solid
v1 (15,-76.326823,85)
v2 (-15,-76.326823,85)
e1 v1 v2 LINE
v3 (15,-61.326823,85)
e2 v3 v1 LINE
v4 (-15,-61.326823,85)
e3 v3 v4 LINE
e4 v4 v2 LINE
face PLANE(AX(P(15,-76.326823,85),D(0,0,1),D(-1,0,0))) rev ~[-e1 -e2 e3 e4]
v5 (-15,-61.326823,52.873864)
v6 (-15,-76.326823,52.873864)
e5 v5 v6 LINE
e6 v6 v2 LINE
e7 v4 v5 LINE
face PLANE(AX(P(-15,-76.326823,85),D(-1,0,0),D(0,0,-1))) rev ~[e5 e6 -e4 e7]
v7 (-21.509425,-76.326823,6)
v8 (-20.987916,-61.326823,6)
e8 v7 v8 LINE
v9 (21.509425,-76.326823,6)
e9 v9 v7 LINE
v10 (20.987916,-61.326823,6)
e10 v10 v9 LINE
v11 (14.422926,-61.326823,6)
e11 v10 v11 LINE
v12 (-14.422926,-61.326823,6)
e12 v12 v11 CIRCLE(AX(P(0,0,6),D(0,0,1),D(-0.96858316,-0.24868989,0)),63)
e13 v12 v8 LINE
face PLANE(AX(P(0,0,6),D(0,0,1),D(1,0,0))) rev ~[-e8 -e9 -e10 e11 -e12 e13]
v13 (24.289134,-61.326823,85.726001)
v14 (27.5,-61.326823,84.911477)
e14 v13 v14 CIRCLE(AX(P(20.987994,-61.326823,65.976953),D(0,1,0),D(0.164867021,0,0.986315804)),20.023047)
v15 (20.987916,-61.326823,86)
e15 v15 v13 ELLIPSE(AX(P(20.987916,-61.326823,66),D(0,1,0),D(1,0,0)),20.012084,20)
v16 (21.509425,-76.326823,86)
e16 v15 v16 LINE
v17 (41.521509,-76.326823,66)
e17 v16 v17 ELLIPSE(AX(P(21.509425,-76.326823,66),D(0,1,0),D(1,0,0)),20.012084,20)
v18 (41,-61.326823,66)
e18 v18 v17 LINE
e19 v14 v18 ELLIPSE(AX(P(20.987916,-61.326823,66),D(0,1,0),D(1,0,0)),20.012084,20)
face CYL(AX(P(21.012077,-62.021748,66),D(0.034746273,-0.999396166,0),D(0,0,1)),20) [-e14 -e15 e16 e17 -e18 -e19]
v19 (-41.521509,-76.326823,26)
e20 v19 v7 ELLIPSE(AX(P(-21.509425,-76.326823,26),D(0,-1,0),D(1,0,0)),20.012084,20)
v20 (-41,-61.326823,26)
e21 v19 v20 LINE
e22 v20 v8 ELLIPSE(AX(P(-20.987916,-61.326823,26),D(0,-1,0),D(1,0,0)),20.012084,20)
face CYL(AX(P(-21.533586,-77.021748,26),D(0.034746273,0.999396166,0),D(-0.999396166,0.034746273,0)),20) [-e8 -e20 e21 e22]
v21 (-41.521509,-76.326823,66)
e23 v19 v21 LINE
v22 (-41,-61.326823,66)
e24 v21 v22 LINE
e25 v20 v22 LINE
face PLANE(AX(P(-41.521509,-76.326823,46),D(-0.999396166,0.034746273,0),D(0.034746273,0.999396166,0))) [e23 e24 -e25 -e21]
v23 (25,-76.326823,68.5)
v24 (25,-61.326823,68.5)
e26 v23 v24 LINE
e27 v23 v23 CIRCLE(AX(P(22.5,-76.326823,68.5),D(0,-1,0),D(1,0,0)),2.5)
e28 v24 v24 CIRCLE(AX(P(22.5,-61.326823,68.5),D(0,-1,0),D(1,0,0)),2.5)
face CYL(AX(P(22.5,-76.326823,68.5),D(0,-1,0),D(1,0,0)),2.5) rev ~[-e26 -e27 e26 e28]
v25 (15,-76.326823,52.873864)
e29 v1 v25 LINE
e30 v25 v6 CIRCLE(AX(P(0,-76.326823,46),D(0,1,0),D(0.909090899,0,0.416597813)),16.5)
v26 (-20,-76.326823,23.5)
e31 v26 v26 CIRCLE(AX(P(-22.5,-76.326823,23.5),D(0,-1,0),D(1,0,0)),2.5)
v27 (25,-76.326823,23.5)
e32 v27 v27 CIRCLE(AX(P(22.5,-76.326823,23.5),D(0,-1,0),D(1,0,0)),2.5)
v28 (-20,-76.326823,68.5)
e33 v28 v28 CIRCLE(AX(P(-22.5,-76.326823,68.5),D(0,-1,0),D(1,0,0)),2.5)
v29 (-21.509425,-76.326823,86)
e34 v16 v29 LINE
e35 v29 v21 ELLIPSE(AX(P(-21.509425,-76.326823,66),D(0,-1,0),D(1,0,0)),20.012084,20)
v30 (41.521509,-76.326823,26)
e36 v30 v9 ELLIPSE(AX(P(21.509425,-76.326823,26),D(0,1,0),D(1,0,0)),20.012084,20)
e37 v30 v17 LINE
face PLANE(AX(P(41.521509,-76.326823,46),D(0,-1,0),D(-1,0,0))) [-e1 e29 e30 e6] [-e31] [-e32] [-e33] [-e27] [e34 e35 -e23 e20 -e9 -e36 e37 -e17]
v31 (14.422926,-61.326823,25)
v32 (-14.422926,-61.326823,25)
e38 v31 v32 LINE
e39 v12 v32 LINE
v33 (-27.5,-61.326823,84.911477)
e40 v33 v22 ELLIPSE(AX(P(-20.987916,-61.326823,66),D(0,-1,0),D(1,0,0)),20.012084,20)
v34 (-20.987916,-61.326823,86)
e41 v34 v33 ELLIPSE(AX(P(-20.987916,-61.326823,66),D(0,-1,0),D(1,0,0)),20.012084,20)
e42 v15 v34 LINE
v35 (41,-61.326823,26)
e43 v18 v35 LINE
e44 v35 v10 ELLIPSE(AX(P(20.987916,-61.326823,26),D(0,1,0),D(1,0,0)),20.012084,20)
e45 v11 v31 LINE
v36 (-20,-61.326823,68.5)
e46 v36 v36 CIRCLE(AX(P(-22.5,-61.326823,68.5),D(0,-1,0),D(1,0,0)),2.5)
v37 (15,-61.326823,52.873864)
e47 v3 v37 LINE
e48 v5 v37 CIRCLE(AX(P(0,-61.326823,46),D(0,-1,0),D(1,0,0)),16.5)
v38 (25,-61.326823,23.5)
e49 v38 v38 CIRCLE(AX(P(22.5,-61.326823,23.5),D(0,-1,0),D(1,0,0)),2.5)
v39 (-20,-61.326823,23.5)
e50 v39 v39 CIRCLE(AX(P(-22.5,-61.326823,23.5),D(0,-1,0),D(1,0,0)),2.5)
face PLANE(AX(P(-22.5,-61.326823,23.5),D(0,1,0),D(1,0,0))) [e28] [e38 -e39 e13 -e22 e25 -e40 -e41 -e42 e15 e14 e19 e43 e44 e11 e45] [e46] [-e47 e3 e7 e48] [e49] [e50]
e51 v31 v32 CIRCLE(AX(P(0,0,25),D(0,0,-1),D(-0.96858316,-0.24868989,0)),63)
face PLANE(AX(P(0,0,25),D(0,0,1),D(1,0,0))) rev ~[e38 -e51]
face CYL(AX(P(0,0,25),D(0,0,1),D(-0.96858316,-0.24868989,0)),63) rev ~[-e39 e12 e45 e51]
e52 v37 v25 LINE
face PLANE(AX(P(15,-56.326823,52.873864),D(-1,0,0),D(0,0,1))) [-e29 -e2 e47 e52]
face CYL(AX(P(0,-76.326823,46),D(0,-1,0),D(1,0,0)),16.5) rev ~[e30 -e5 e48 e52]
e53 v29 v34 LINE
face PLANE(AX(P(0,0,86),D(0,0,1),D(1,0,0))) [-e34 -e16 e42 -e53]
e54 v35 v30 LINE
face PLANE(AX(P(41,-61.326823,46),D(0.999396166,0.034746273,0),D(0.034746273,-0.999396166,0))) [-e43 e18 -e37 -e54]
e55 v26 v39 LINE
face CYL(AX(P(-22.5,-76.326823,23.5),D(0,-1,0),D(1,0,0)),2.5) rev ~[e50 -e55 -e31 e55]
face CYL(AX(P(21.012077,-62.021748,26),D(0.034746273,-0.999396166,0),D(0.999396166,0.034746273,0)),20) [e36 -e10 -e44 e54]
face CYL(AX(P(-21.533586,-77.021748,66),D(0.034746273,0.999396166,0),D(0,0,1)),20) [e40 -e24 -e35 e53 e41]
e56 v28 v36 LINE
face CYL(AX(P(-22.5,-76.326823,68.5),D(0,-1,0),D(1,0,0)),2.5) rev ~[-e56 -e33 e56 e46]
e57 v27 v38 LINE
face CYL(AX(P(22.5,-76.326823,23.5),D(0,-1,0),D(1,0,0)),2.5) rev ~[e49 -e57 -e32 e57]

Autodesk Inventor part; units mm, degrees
ref_plane "YZ Plane" through (0, 0, 0) normal (1, 0, 0) x (0, 1, 0)
sketch "Sketch3" plane through (0, 0, 0) normal (0, 0, 1) x (1, 0, 0)
  circle A0 centre (0, 0) radius 60
  dimension "d49" = 120
sketch "Sketch3 outline for Extrusion2" plane through (0, 0, 0) normal (0, 0, 1) x (1, 0, 0)
  circle A0 centre (0, 0) radius 60
extrude "Extrusion2" add sketch "Sketch3 outline for Extrusion2" along normal blind 67
sketch "Sketch4" plane through (0, 0, 0) normal (0, 0, -1) x (-1, 0, 0)
  circle A0 centre (0, 0) radius 4.25
  dimension "d52" = 8.5
sketch "Sketch4 outline for Extrusion3" plane through (0, 0, 0) normal (0, 0, -1) x (-1, 0, 0)
  circle A0 centre (0, 0) radius 4.25
extrude "Extrusion3" cut sketch "Sketch4 outline for Extrusion3" against normal through all
ref_plane "Work Plane11" through (0, 0, 46) normal (0, 0, 1) x (1, 0, 0)
sketch "Sketch6" plane through (0, 0, 46) normal (0, 0, 1) x (1, 0, 0)
  line L0 (-27.5, -53.326823) -> (27.5, -53.326823)
  line L1 (27.5, -53.326823) -> (27.5, -61.326823)
  line L2 (27.5, -61.326823) -> (-27.5, -61.326823)
  line L3 (-27.5, -61.326823) -> (-27.5, -53.326823)
  circle A0 centre (0, 0) radius 4.25 construction
  circle A1 centre (0, 0) radius 60 construction
  dimension "d63" = 55
  dimension "d64" = 8
sketch "Sketch6 outline for Extrusion5" plane through (0, 0, 46) normal (0, 0, 1) x (1, 0, 0)
  line L0 (-27.5, -53.326823) -> (27.5, -53.326823)
  line L1 (27.5, -53.326823) -> (27.5, -61.326823)
  line L2 (27.5, -61.326823) -> (-27.5, -61.326823)
  line L3 (-27.5, -61.326823) -> (-27.5, -53.326823)
extrude "Extrusion5" add sketch "Sketch6 outline for Extrusion5" along normal mid plane 42
sketch "Sketch7" plane through (0, 0, 46) normal (0, 0, 1) x (1, 0, 0)
  line L0 (-41, -61.326823) -> (41, -61.326823)
  line L1 (41.521509, -76.326823) -> (-41.521509, -76.326823)
  line L2 (27.5, -61.326823) -> (-27.5, -61.326823)
  line L3 (-41.521509, -76.326823) -> (-41, -61.326823)
  line L4 (41.521509, -76.326823) -> (41, -61.326823)
  point P0 (0, 0)
  point P1 (0, -61.326823)
  point P2 (0, -76.326823)
  dimension "d67" = 83.04302
  dimension "d99" = 82
  dimension "d100" = 15
sketch "Sketch7 outline for Extrusion6" plane through (0, 0, 46) normal (0, 0, 1) x (1, 0, 0)
  line L0 (-41, -61.326823) -> (0, -61.326823)
  line L1 (0, -61.326823) -> (41, -61.326823)
  line L2 (41, -61.326823) -> (41.521509, -76.326823)
  line L3 (41.521509, -76.326823) -> (-41.521509, -76.326823)
  line L4 (-41.521509, -76.326823) -> (-41, -61.326823)
extrude "Extrusion6" add sketch "Sketch7 outline for Extrusion6" along normal mid plane 80
sketch "Sketch8" plane through (-41.521509, -76.326823, 86) normal (0, -1, 0) x (1, 0, 0)
  line L0 (64.021509, -62.5) -> (19.021509, -62.5) construction
  line L1 (19.021509, -62.5) -> (19.021509, -17.5) construction
  line L2 (19.021509, -17.5) -> (64.021509, -17.5) construction
  line L3 (64.021509, -17.5) -> (64.021509, -62.5) construction
  circle A0 centre (64.021509, -62.5) radius 2.5
  circle A1 centre (64.021509, -17.5) radius 2.5
  circle A2 centre (19.021509, -62.5) radius 2.5
  circle A3 centre (19.021509, -17.5) radius 2.5
  line L4 (0, 0) -> (83.043018, 0)
  line L5 (83.043018, 0) -> (83.043018, -80)
  point P0 (23.25, -86)
  point P1 (41.521509, -17.5)
  point P2 (41.521509, 0)
  point P3 (64.021509, -40)
  point P4 (83.043018, -40)
  dimension "d75" = 45
  dimension "d78" = 5
  dimension "d79" = 5
  dimension "d101" = 45
  dimension "d102" = 5
  dimension "d103" = 5
sketch "Sketch8 outline for Extrusion7" plane through (-41.521509, -76.326823, 86) normal (0, -1, 0) x (1, 0, 0)
  circle A0 centre (64.021509, -62.5) radius 2.5
  circle A1 centre (64.021509, -17.5) radius 2.5
  circle A2 centre (19.021509, -62.5) radius 2.5
  circle A3 centre (19.021509, -17.5) radius 2.5
extrude "Extrusion7" cut sketch "Sketch8 outline for Extrusion7" against normal blind 25
sketch "Sketch9" plane through (-41.521509, -76.326823, 86) normal (0, -1, 0) x (1, 0, 0)
  circle A0 centre (41.521509, -40) radius 16.5
  circle A1 centre (19.021509, -62.5) radius 2.5 construction
  circle A2 centre (64.021509, -62.5) radius 2.5 construction
  circle A3 centre (64.021509, -17.5) radius 2.5 construction
  circle A4 centre (19.021509, -17.5) radius 2.5 construction
  line L0 (83.043018, 0) -> (83.043018, -80) construction
  line L1 (0, 0) -> (83.043018, 0) construction
  line L2 (0, 0) -> (0, -80) construction
  line L3 (83.043018, -80) -> (0, -80) construction
  point P0 (23.25, -86)
  point P1 (0, -40)
  point P2 (41.521509, 0)
  dimension "d82" = 33
sketch "Sketch9 outline for Extrusion8" plane through (-41.521509, -76.326823, 86) normal (0, -1, 0) x (1, 0, 0)
  circle A0 centre (41.521509, -40) radius 16.5
extrude "Extrusion8" cut sketch "Sketch9 outline for Extrusion8" against normal blind 45
sketch "Sketch14" plane through (0, 0, 46) normal (0, 0, 1) x (1, 0, 0)
  line L0 (16.5, -76.326823) -> (16.5, -31.326823)
  line L1 (16.5, -31.326823) -> (-16.5, -31.326823)
  line L2 (-16.5, -31.326823) -> (-16.5, -16.326823)
  line L3 (-16.5, -16.326823) -> (16.5, -16.326823)
  line L4 (16.5, -16.326823) -> (16.5, -31.326823)
  point P0 (0, 0)
  dimension "d91" = 33
  dimension "d92" = 15
sketch "Sketch14 outline for Extrusion10" plane through (0, 0, 46) normal (0, 0, 1) x (1, 0, 0)
  line L0 (16.5, -31.326823) -> (-16.5, -31.326823)
  line L1 (-16.5, -31.326823) -> (-16.5, -16.326823)
  line L2 (-16.5, -16.326823) -> (16.5, -16.326823)
  line L3 (16.5, -16.326823) -> (16.5, -31.326823)
extrude "Extrusion10" cut sketch "Sketch14 outline for Extrusion10" along normal mid plane 33
sketch "Sketch15" plane through (16.5, -31.326823, 29.5) normal (-1, 0, 0) x (0, 0, 1)
  line L0 (33, 15) -> (0, 15) projected
  line L1 (0, 15) -> (0, 0) projected
  line L2 (0, 0) -> (16.5, 0) projected
  line L3 (16.5, 0) -> (33, 0) projected
  line L4 (33, 0) -> (33, 15) projected
  line L5 (24, 14) -> (9, 14)
  line L6 (9, 14) -> (9, 1)
  line L7 (9, 1) -> (24, 1)
  line L8 (24, 1) -> (24, 14)
  point P0 (-29.5, 31.326823)
  point P1 (16.5, 1)
  point P2 (24, 7.5)
  point P3 (33, 7.5)
  dimension "d95" = 15
  dimension "d96" = 13
sketch "Sketch15 outline for Extrusion11" plane through (16.5, -31.326823, 29.5) normal (-1, 0, 0) x (0, 0, 1)
  line L0 (24, 1) -> (24, 14)
  line L1 (9, 1) -> (24, 1)
  line L2 (9, 14) -> (9, 1)
  line L3 (24, 14) -> (9, 14)
extrude "Extrusion11" cut sketch "Sketch15 outline for Extrusion11" along normal through all
fillet "Fillet4" radius 20 4 edges at (41.2608, -68.8268, 86) (41.2608, -68.8268, 6) (-41.2608, -68.8268, 86) (-41.2608, -68.8268, 6)
ref_plane "Work Plane15" through (0, 0, 25) normal (0, 0, -1) x (-0.9685832, -0.2486899, 0)
sketch "Sketch16" plane through (0, 0, 25) normal (0, 0, -1) x (-0.9685832, -0.2486899, 0)
  circle A0 centre (0, 0) radius 60
  circle A1 centre (0, 0) radius 63
  dimension "d107" = 3
sketch "Sketch16 outline for Extrusion12" plane through (0, 0, 25) normal (0, 0, -1) x (-0.9685832, -0.2486899, 0)
  circle A0 centre (0, 0) radius 63
extrude "Extrusion12" cut sketch "Sketch16 outline for Extrusion12" along normal through all
sketch "Sketch17" plane through (0, 0, 25) normal (0, 0, -1) x (-1, 0, 0)
  circle A0 centre (33.900411, 8.704146) radius 2.5
  circle A1 centre (9.412194, 33.71069) radius 2.5
  circle A2 centre (-24.488217, 25.006544) radius 2.5
  circle A3 centre (-33.900411, -8.704146) radius 2.5
  circle A4 centre (-9.412194, -33.71069) radius 2.5
  circle A5 centre (24.488217, -25.006544) radius 2.5
  line L0 (33.900411, 8.704146) -> (-33.900411, -8.704146) construction
  line L1 (-1.798057, -79.48798) -> (39.869276, -68.789627)
  point P0 (0, 0)
  dimension "d108" = 5
  dimension "d109" = 35
  dimension "d112" = 360
sketch "Sketch17 outline for Extrusion13" plane through (0, 0, 25) normal (0, 0, -1) x (-1, 0, 0)
  circle A0 centre (33.900411, 8.704146) radius 2.5
  circle A1 centre (9.412194, 33.71069) radius 2.5
  circle A2 centre (-24.488217, 25.006544) radius 2.5
  circle A3 centre (-33.900411, -8.704146) radius 2.5
extrude "Extrusion13" cut sketch "Sketch17 outline for Extrusion13" against normal blind 25
sketch "Sketch20" plane through (0, 0, 67) normal (0, 0, 1) x (1, 0, 0)
  arc A0 (27.5, -53.326823) -> (-27.5, -53.326823) centre (0, 0) ccw
  circle A1 centre (0, 0) radius 60
  circle A2 centre (0, 0) radius 4.25
sketch "Sketch20 outline for Extrusion15" plane through (0, 0, 67) normal (0, 0, 1) x (1, 0, 0)
  circle A0 centre (0, 0) radius 60
  circle A1 centre (0, 0) radius 4.25
extrude "Extrusion15" add sketch "Sketch20 outline for Extrusion15" along normal blind 25
sketch "Sketch21" plane through (-21.509425, -76.326823, 6) normal (0, -1, 0) x (1, 0, 0)
  line L0 (36.509425, 79) -> (6.509425, 79)
  line L1 (6.509425, 79) -> (6.509425, 55)
  line L2 (6.509425, 55) -> (36.509425, 55)
  line L3 (36.509425, 55) -> (36.509425, 79)
  circle A0 centre (21.509425, 40) radius 16.5
  line L4 (36.509425, 67) -> (6.509425, 67)
  point P0 (21.509425, -6)
  point P1 (21.509425, 67)
  dimension "d124" = 30
  dimension "d125" = 24
  dimension "d126" = 27
sketch "Sketch21 outline for Extrusion16" plane through (-21.509425, -76.326823, 6) normal (0, -1, 0) x (1, 0, 0)
  line L0 (6.509425, 55) -> (36.509425, 55)
  line L1 (36.509425, 55) -> (36.509425, 79)
  line L2 (36.509425, 79) -> (6.509425, 79)
  line L3 (6.509425, 79) -> (6.509425, 55)
extrude "Extrusion16" cut sketch "Sketch21 outline for Extrusion16" against normal blind 15
sketch "Sketch22" plane through (-27.5, -61.326823, 67) normal (0, 1, 0) x (1, 0, 0)
  line L0 (55, 0) -> (55, 42)
  line L1 (0, 0) -> (0, 42)
  line L2 (0, 0) -> (3, 0)
  line L3 (55, 0) -> (55, -17.911477)
  line L4 (0, 0) -> (0, -17.911477)
  line L5 (5.990575, -19) -> (6.512084, -19) construction
  line L6 (-13.5, 1) -> (-14.021509, 1) construction
  circle A0 centre (5, -1.5) radius 2.5
  line L7 (42.5, -18) -> (42.5, 6)
  line L8 (12.5, -18) -> (42.5, -18)
  line L9 (12.5, 6) -> (12.5, -18)
  line L10 (7, 0) -> (12.5, 0)
  line L11 (12.5, 0) -> (12.5, -18)
  line L12 (12.5, -18) -> (42.5, -18)
  line L13 (55, 0) -> (52, 0)
  circle A1 centre (50, -1.5) radius 2.5
  line L14 (48, 0) -> (42.5, 0)
  line L15 (42.5, 0) -> (42.5, -18)
  arc A2 (48, 0) -> (52, 0) centre (50, -1.5) ccw
  arc A3 (3, 0) -> (7, 0) centre (5, -1.5) ccw
  line L16 (5.990575, -19) -> (6.285813, -19)
  line L17 (-13.5, 1) -> (-14.021509, 1)
  line L18 (5.990575, -19) -> (6.512084, -19)
  line L19 (48.487916, -19) -> (49.009425, -19)
  arc A4 (0, -17.911477) -> (6.285813, -19) centre (6.512084, 1) ccw
  arc A5 (48.487916, -19) -> (55, -17.911477) centre (48.487997, 1.023032) ccw
  line L20 (48.487916, -19) -> (6.285813, -19)
  line L21 (5.990575, -19) -> (49.009425, -19)
  ellipse E0 centre (5.990575, 1) end of major axis (-14.021509, 1) minor radius 20 (-14.021509, 1) -> (5.990575, -19) ccw
  line L22 (5.990575, -19) -> (6.512084, -19)
  ellipse E1 centre (6.512084, 1) end of major axis (-13.5, 1) minor radius 20 (-13.5, 1) -> (6.512084, -19) ccw
  line L23 (-13.5, 1) -> (-14.021509, 1)
  ellipse E2 centre (48.487916, 1) end of major axis (68.5, 1) minor radius 20 (48.487916, -19) -> (68.5, 1) ccw
  line L24 (48.487916, -19) -> (49.009425, -19)
  ellipse E3 centre (49.009425, 1) end of major axis (69.021509, 1) minor radius 20 (49.009425, -19) -> (69.021509, 1) ccw
  line L25 (69.021509, 1) -> (68.5, 1)
  point P0 (27.5, 67)
  point P1 (51.789134, -18.726001)
sketch "Sketch22 outline for Extrusion17" plane through (-27.5, -61.326823, 67) normal (0, 1, 0) x (1, 0, 0)
  line L0 (55, -17.911477) -> (55, 0)
  arc A0 (51.789134, -18.726001) -> (55, -17.911477) centre (48.487997, 1.023032) ccw
  arc A1 (48.487916, -19) -> (51.789134, -18.726001) centre (48.487997, 1.023032) ccw
  line L1 (6.285813, -19) -> (48.487916, -19)
  arc A2 (0, -17.911477) -> (6.285813, -19) centre (6.512084, 1) ccw
  line L2 (0, 0) -> (0, -17.911477)
  line L3 (3, 0) -> (0, 0)
  arc A3 (7, 0) -> (3, 0) centre (5, -1.5) cw
  line L4 (12.5, 0) -> (7, 0)
  line L5 (12.5, -18) -> (12.5, 0)
  line L6 (42.5, -18) -> (12.5, -18)
  line L7 (42.5, 0) -> (42.5, -18)
  line L8 (48, 0) -> (42.5, 0)
  arc A4 (52, 0) -> (48, 0) centre (50, -1.5) cw
  line L9 (55, 0) -> (52, 0)
extrude "Extrusion17" add sketch "Sketch22 outline for Extrusion17" along normal blind 15
sketch "Sketch23" plane through (-21.509425, -76.326823, 6) normal (0, -1, 0) x (1, 0, 0)
  line L0 (36.509425, 79) -> (36.509425, 55)
  line L1 (36.509425, 55) -> (6.509425, 55)
  line L2 (6.509425, 55) -> (6.509425, 79)
  line L3 (6.509425, 79) -> (36.509425, 79)
  point P0 (21.509425, -6)
sketch "Sketch23 outline for Extrusion18" plane through (-21.509425, -76.326823, 6) normal (0, -1, 0) x (1, 0, 0)
  line L0 (36.509425, 79) -> (36.509425, 55)
  line L1 (36.509425, 55) -> (6.509425, 55)
  line L2 (6.509425, 55) -> (6.509425, 79)
  line L3 (6.509425, 79) -> (36.509425, 79)
extrude "Extrusion18" cut sketch "Sketch23 outline for Extrusion18" against normal blind 20
sketch "Sketch25" plane through (-21.509425, -56.326823, 6) normal (0, -1, 0) x (1, 0, 0)
  line L0 (36.509425, 55) -> (28.383288, 55)
  arc A0 (21.509425, 56.5) -> (5.009425, 40) centre (21.509425, 40) ccw
  line L1 (36.509425, 55) -> (6.509425, 55)
  line L2 (6.509425, 55) -> (6.509425, 46.873864)
  line L3 (6.509425, 46.873864) -> (36.509425, 46.873864)
  line L4 (36.509425, 46.873864) -> (36.509425, 55)
  point P0 (21.509425, -6)
sketch "Sketch25 outline for Extrusion20" plane through (-21.509425, -56.326823, 6) normal (0, -1, 0) x (1, 0, 0)
  line L0 (36.509425, 46.873864) -> (36.509425, 55)
  line L1 (6.509425, 46.873864) -> (36.509425, 46.873864)
  line L2 (6.509425, 55) -> (6.509425, 46.873864)
  line L3 (36.509425, 55) -> (6.509425, 55)
extrude "Extrusion20" cut sketch "Sketch25 outline for Extrusion20" along normal blind 25
sketch "Sketch26" plane through (0, 0, 92) normal (0, 0, 1) x (1, 0, 0)
  circle A0 centre (0, 0) radius 4.25 projected
  circle A1 centre (0, 0) radius 13.5
  dimension "d138" = 27
sketch "Sketch26 outline for Extrusion21" plane through (0, 0, 92) normal (0, 0, 1) x (1, 0, 0)
  circle A0 centre (0, 0) radius 13.5
  circle A1 centre (0, 0) radius 4.25
extrude "Extrusion21" cut sketch "Sketch26 outline for Extrusion21" against normal blind 10
sketch "Sketch27" plane through (0, 0, 82) normal (0, 0, 1) x (1, 0, 0)
  circle A0 centre (9.525, 0) radius 1.5
  circle A1 centre (4.7625, 8.248892) radius 1.5
  circle A2 centre (-4.7625, 8.248892) radius 1.5
  circle A3 centre (-9.525, 0) radius 1.5
  circle A4 centre (-4.7625, -8.248892) radius 1.5
  circle A5 centre (4.7625, -8.248892) radius 1.5
  point P0 (0, 0)
  dimension "d141" = 3
  dimension "d142" = 9.525
  dimension "d145" = 360
sketch "Sketch27 outline for Extrusion22" plane through (0, 0, 82) normal (0, 0, 1) x (1, 0, 0)
  circle A0 centre (9.525, 0) radius 1.5
  circle A1 centre (4.7625, 8.248892) radius 1.5
  circle A2 centre (-4.7625, 8.248892) radius 1.5
  circle A3 centre (-9.525, 0) radius 1.5
  circle A4 centre (-4.7625, -8.248892) radius 1.5
  circle A5 centre (4.7625, -8.248892) radius 1.5
extrude "Extrusion22" cut sketch "Sketch27 outline for Extrusion22" against normal blind 15
sketch "Sketch28" plane through (0, 0, 0) normal (0, 1, 0) x (-1, 0, 0)
  circle A0 centre (0, 79.65) radius 1.5
  circle A1 centre (0, 84.75) radius 1.5
  line L0 (4.25, 82) -> (-4.25, 82) projected
  line L1 (0, 82) -> (0, 83.25)
  line L2 (0, 83.25) -> (0, 81.15)
  point P0 (0, 0)
  point P1 (0, 86.25)
  dimension "d151" = 3
  dimension "d150" = 3
  dimension "d153" = 1.25
  dimension "d166" = 2.1
sketch "Sketch28 outline for Extrusion23" plane through (0, 0, 0) normal (0, 1, 0) x (-1, 0, 0)
  circle A0 centre (0, 79.65) radius 1.5
  circle A1 centre (0, 84.75) radius 1.5
extrude "Extrusion23" cut sketch "Sketch28 outline for Extrusion23" along normal through all
sketch "Sketch29" plane through (0, 0, 92) normal (0, 0, 1) x (1, 0, 0)
  circle A0 centre (0, 0) radius 17.5
  circle A1 centre (0, 0) radius 50
  dimension "d156" = 35
  dimension "d157" = 100
sketch "Sketch29 outline for Extrusion24" plane through (0, 0, 92) normal (0, 0, 1) x (1, 0, 0)
  circle A0 centre (0, 0) radius 50
  circle A1 centre (0, 0) radius 17.5
extrude "Extrusion24" cut sketch "Sketch29 outline for Extrusion24" against normal blind 20
sketch "Sketch30" plane through (0, 0, 82) normal (0, 0, 1) x (1, 0, 0)
  circle A0 centre (0, 0) radius 17.5 projected
sketch "Sketch30 outline for Extrusion25" plane through (0, 0, 82) normal (0, 0, 1) x (1, 0, 0)
  circle A0 centre (0, 0) radius 17.5
extrude "Extrusion25" cut sketch "Sketch30 outline for Extrusion25" along normal through all
sketch "Sketch32" plane through (0, 0, 82) normal (0, 0, 1) x (1, 0, 0)
  circle A0 centre (0, 0) radius 7.5
  dimension "d162" = 15
sketch "Sketch32 outline for Extrusion26" plane through (0, 0, 82) normal (0, 0, 1) x (1, 0, 0)
  circle A0 centre (0, 0) radius 7.5
extrude "Extrusion26" cut sketch "Sketch32 outline for Extrusion26" against normal blind 5
sketch "Sketch34" plane through (0, 0, 72) normal (0, 0, 1) x (1, 0, 0)
  line L0 (-15, -56.326823) -> (-15, -76.326823)
  line L1 (-15, -56.326823) -> (15, -56.326823)
  line L2 (15, -56.326823) -> (15, -21.326823)
  line L3 (15, -21.326823) -> (-15, -21.326823)
  line L4 (-15, -21.326823) -> (-15, -56.326823)
  line L5 (15, -76.326823) -> (15, -56.326823)
  point P0 (0, 0)
  dimension "d167" = 35
sketch "Sketch34 outline for Extrusion27" plane through (0, 0, 72) normal (0, 0, 1) x (1, 0, 0)
  line L0 (-15, -21.326823) -> (-15, -56.326823)
  line L1 (15, -21.326823) -> (-15, -21.326823)
  line L2 (15, -56.326823) -> (15, -21.326823)
  line L3 (-15, -56.326823) -> (15, -56.326823)
extrude "Extrusion27" cut sketch "Sketch34 outline for Extrusion27" along normal blind 13 and the other way blind 20
sketch "Sketch35" plane through (-22.5, -61.326823, 23.5) normal (0, 1, 0) x (1, 0, 0)
  line L0 (-57.985682, -108.685888) -> (95.221181, -108.685888)
  line L1 (95.221181, -108.685888) -> (95.221181, 61.564991)
  line L2 (95.221181, 61.564991) -> (-57.985682, 61.564991)
  line L3 (-57.985682, 61.564991) -> (-57.985682, -108.685888)
  point P0 (22.5, 23.5)
sketch "Sketch35 outline for Extrusion28" plane through (-22.5, -61.326823, 23.5) normal (0, 1, 0) x (1, 0, 0)
  line L0 (-57.985682, 61.564991) -> (-57.985682, -108.685888)
  line L1 (95.221181, 61.564991) -> (-57.985682, 61.564991)
  line L2 (95.221181, -108.685888) -> (95.221181, 61.564991)
  line L3 (-57.985682, -108.685888) -> (95.221181, -108.685888)
extrude "Extrusion28" cut sketch "Sketch35 outline for Extrusion28" along normal through all
equation "\"d43\" = da_aw"
equation "\"d46\" = da_aw"
equation "\"da_aw\" = 81.5"
properties part number "AA035" material "ABS Plastic"
